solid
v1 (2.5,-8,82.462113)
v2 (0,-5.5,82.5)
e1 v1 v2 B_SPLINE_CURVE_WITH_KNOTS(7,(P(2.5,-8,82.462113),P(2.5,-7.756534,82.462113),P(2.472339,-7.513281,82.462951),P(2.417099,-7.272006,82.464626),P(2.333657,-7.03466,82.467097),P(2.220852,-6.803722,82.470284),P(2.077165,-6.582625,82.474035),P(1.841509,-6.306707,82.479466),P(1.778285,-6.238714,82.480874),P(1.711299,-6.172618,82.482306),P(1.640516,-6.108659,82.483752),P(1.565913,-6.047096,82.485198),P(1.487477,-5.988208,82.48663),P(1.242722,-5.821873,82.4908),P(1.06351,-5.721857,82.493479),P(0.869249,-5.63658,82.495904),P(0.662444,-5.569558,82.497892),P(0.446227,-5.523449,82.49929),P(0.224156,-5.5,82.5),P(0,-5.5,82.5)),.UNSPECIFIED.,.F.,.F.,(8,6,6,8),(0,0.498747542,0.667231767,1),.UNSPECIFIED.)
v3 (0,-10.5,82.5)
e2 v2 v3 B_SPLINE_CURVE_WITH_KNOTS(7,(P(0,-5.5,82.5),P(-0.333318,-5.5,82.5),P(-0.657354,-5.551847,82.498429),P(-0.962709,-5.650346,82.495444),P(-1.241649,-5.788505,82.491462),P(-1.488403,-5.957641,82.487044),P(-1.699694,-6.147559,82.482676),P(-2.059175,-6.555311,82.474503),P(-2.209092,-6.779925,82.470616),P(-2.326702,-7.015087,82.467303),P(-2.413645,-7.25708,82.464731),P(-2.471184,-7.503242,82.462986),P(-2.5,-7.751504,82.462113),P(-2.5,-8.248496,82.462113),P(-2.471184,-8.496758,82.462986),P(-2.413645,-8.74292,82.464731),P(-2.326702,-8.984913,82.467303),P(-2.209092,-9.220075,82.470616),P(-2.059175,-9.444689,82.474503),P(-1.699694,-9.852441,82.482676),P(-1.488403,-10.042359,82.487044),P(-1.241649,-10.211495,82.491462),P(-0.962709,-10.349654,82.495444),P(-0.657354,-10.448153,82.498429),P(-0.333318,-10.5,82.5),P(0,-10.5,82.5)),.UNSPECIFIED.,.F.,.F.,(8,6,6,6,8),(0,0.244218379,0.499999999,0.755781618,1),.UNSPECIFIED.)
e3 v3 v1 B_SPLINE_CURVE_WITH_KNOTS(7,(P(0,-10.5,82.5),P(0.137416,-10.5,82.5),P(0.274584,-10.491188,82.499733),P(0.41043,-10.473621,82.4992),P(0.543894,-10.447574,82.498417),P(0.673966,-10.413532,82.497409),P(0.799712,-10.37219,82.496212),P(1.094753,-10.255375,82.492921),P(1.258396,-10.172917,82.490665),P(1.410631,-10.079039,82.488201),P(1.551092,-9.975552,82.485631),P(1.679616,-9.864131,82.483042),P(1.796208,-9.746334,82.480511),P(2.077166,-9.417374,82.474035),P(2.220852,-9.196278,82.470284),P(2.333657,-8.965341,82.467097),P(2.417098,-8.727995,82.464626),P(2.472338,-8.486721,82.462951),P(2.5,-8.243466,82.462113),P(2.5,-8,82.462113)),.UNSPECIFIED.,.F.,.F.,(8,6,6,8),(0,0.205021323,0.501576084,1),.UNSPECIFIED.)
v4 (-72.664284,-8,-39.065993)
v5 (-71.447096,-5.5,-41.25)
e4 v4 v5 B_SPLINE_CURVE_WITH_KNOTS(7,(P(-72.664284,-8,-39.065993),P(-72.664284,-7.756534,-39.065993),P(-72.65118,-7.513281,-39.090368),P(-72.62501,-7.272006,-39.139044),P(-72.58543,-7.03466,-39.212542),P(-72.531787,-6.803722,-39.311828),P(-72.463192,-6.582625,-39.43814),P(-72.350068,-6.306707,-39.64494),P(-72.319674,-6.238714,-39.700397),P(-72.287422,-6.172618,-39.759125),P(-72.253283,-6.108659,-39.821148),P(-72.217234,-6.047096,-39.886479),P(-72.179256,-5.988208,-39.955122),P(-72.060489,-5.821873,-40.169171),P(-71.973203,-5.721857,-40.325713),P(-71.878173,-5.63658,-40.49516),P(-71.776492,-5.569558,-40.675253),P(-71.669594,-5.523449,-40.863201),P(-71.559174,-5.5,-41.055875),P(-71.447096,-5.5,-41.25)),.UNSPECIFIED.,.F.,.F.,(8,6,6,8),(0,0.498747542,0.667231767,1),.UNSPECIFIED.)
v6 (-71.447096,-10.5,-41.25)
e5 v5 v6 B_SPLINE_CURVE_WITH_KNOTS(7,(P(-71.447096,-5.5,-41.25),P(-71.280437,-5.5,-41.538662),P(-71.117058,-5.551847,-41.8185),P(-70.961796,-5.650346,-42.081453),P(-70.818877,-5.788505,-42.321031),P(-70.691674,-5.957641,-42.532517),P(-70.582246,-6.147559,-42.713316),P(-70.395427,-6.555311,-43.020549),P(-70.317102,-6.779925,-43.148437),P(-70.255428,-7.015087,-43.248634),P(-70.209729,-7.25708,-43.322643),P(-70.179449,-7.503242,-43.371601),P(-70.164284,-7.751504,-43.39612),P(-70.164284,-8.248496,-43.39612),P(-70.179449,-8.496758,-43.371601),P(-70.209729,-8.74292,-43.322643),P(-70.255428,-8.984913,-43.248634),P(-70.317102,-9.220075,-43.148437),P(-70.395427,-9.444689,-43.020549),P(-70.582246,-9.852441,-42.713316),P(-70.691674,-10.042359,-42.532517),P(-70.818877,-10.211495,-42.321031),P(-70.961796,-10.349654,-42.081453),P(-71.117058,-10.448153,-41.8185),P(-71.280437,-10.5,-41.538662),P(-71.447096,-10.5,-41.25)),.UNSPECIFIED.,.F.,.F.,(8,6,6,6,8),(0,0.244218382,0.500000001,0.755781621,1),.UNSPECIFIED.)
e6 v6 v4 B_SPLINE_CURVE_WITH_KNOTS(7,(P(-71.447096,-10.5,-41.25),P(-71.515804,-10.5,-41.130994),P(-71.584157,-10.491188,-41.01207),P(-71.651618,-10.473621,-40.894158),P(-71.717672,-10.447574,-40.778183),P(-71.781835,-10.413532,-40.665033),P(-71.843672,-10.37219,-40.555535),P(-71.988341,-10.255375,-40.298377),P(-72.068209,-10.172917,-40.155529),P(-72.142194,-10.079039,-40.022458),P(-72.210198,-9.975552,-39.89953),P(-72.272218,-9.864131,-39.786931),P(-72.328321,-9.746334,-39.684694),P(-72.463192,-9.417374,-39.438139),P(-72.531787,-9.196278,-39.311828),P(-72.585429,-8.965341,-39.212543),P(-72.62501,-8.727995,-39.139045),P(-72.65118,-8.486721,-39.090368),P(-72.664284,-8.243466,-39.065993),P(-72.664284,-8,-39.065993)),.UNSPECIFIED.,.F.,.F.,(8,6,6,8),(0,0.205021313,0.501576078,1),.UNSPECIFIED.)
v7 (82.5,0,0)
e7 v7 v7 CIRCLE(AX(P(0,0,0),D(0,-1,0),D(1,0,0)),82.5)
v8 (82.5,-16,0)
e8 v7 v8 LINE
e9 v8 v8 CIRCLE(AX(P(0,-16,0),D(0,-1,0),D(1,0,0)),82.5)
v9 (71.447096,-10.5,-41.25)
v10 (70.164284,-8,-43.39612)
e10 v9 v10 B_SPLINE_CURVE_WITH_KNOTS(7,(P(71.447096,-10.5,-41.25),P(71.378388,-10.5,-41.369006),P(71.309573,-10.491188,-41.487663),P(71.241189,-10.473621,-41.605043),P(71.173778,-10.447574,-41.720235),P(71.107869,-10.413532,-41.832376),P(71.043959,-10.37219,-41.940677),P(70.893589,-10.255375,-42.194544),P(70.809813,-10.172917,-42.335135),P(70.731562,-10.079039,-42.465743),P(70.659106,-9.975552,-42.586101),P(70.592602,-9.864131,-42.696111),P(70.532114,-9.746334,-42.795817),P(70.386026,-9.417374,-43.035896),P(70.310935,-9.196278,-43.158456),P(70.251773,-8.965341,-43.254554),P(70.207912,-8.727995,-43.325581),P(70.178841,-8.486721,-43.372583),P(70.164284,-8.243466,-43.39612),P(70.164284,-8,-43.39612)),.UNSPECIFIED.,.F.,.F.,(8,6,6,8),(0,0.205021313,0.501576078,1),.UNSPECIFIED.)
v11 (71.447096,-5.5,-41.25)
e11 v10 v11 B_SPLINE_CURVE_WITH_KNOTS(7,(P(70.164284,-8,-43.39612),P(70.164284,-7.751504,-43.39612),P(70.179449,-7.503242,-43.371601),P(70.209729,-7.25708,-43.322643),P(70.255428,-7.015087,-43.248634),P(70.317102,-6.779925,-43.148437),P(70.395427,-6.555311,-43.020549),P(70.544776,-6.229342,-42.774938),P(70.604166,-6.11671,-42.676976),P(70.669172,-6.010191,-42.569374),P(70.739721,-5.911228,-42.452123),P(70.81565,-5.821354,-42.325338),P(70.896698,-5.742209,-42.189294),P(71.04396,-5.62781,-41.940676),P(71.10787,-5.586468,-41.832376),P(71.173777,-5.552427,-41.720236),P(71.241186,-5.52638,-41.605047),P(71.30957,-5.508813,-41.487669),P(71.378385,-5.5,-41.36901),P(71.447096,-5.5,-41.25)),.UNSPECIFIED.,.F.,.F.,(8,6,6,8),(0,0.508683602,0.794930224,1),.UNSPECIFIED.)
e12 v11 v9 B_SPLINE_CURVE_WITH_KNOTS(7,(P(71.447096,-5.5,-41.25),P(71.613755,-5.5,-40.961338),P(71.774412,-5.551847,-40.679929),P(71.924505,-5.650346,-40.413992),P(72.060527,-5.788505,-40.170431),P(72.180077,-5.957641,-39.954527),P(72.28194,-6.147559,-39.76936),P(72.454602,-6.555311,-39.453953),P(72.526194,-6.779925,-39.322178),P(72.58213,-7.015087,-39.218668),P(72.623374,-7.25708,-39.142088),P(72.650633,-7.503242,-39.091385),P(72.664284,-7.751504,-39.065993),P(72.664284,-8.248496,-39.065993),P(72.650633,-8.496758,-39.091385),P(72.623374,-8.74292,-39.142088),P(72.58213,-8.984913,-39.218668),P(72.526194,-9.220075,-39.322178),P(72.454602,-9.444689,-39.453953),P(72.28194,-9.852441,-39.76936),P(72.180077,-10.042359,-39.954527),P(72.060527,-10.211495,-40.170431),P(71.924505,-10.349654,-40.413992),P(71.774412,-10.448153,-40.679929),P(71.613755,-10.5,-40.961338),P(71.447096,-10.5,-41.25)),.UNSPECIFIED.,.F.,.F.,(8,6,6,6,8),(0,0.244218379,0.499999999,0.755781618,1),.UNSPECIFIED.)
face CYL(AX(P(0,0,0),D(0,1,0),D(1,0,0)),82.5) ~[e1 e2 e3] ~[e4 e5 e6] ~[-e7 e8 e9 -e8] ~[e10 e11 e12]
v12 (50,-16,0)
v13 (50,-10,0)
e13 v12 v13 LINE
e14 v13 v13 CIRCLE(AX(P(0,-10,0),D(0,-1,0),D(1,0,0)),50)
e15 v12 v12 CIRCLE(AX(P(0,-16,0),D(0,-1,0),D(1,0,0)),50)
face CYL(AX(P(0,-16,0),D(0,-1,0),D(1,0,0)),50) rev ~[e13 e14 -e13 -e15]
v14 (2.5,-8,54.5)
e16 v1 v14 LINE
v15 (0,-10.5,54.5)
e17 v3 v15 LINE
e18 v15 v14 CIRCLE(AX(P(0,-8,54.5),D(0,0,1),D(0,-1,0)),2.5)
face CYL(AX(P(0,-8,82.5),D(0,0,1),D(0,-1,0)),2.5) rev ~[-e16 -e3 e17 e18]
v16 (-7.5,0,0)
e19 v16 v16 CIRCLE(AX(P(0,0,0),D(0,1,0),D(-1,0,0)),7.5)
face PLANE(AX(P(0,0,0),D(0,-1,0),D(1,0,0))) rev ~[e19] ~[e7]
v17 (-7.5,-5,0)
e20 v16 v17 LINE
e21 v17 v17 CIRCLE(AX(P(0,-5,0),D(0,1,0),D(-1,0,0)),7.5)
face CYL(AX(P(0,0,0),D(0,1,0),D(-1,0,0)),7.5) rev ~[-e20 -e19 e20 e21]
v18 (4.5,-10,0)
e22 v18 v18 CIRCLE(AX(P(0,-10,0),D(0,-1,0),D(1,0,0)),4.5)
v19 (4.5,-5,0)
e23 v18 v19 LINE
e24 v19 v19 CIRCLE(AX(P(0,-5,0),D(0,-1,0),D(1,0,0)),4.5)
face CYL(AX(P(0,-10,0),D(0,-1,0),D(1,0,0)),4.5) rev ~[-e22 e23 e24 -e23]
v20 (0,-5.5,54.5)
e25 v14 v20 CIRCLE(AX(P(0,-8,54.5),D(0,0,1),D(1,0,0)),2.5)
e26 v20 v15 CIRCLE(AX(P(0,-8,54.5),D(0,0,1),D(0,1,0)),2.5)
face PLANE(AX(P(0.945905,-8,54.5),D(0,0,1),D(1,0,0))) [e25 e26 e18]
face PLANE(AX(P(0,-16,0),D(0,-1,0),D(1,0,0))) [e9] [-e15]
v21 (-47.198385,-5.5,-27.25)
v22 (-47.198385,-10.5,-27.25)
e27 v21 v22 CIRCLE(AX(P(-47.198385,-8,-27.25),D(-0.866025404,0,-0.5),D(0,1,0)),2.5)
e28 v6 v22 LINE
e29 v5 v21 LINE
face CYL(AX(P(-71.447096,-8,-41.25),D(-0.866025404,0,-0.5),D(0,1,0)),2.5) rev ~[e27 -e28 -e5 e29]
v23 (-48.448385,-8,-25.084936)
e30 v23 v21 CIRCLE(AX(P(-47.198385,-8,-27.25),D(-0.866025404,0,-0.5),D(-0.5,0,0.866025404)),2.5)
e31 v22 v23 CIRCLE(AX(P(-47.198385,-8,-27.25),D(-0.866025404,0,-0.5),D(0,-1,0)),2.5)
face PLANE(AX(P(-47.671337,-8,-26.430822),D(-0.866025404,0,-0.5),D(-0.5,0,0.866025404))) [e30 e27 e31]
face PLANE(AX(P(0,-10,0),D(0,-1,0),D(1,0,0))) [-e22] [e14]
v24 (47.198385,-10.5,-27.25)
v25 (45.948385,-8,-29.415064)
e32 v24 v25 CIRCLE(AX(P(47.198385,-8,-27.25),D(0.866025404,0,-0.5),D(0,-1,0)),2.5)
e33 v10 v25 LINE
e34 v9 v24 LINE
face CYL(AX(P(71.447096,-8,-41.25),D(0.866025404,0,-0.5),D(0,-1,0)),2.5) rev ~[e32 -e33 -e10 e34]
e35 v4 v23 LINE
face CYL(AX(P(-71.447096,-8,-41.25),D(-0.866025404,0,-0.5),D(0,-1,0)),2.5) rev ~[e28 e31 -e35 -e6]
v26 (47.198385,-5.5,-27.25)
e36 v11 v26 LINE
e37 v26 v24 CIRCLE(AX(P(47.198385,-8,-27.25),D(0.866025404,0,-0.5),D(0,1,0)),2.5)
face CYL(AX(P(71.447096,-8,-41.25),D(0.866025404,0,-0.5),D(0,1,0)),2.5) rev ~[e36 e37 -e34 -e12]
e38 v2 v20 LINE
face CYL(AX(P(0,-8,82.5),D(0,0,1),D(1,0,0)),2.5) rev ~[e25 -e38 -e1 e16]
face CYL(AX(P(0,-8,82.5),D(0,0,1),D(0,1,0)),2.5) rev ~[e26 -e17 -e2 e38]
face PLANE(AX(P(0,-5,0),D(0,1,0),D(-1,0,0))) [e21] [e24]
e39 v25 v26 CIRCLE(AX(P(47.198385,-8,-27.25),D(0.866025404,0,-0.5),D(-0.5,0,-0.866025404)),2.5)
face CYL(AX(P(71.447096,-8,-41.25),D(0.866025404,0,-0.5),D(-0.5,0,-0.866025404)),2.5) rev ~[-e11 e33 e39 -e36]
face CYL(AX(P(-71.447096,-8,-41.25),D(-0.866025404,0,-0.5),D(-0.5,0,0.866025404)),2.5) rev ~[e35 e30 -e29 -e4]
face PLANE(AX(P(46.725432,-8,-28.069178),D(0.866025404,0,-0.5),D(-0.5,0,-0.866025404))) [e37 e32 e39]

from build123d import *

# Parameters (mm, degrees)
F0_R            = 82.5
F1_DEPTH        = 16
F2_R            = 50
F3_DEPTH        = 6
F6_DEPTH        = 28
F6_COPIES_COUNT = 3
F7_R            = 4.5
F8_DEPTH        = 25
F9_R            = 7.5
F9_R_2          = 4.5
F10_DEPTH       = 5


# Not quite as in the source:
# - a pattern or mirror of a feature is missing from the dataset's text; its kind, count and spacing are read off the source's solid


with BuildPart() as f1:
    # F0 (on Front) → F1 (new body)
    with BuildSketch(Plane.XZ):
        Circle(F0_R)
    extrude(amount=F1_DEPTH)

    # F2 (on face) → F3 (cut)
    with BuildSketch(Plane.XZ.offset(16)):
        Circle(F2_R)
    extrude(amount=-F3_DEPTH, mode=Mode.SUBTRACT)

    # F5 (on offset) → F6 (cut)
    with BuildSketch(Plane.XY.offset(82.5)):
        with BuildLine():
            ThreePointArc((2.5, -8), (1.767766953, -6.232233047), (0, -5.5))
            Line((0, -5.5), (0, -10.5))
            ThreePointArc((0, -10.5), (1.767766953, -9.767766953), (2.5, -8))
        make_face()
        with BuildLine():
            Line((0, -10.5), (0, -5.5))
            ThreePointArc((0, -5.5), (-2.5, -8), (0, -10.5))
        make_face()
    f6 = extrude(amount=-F6_DEPTH, mode=Mode.SUBTRACT)

    # F6_copies: F6 ×3 about axis
    f6_copies_axis = Axis((0, 0, 0), (0, 1, 0))
    for i in range(1, F6_COPIES_COUNT):
        add(f6.rotate(f6_copies_axis, i * 360 / F6_COPIES_COUNT), mode=Mode.SUBTRACT)

    # F7 (on face) → F8 (cut)
    with BuildSketch(Plane.XZ.offset(10)):
        Circle(F7_R)
    extrude(amount=-F8_DEPTH, mode=Mode.SUBTRACT)

    # F9 (on face) → F10 (cut)
    with BuildSketch(Plane(origin=(0, 0, 0), x_dir=(-1, 0, 0), z_dir=(0, 1, 0))):
        Circle(F9_R)
        Circle(F9_R_2, mode=Mode.SUBTRACT)
    extrude(amount=-F10_DEPTH, mode=Mode.SUBTRACT)


solid = f1.part
